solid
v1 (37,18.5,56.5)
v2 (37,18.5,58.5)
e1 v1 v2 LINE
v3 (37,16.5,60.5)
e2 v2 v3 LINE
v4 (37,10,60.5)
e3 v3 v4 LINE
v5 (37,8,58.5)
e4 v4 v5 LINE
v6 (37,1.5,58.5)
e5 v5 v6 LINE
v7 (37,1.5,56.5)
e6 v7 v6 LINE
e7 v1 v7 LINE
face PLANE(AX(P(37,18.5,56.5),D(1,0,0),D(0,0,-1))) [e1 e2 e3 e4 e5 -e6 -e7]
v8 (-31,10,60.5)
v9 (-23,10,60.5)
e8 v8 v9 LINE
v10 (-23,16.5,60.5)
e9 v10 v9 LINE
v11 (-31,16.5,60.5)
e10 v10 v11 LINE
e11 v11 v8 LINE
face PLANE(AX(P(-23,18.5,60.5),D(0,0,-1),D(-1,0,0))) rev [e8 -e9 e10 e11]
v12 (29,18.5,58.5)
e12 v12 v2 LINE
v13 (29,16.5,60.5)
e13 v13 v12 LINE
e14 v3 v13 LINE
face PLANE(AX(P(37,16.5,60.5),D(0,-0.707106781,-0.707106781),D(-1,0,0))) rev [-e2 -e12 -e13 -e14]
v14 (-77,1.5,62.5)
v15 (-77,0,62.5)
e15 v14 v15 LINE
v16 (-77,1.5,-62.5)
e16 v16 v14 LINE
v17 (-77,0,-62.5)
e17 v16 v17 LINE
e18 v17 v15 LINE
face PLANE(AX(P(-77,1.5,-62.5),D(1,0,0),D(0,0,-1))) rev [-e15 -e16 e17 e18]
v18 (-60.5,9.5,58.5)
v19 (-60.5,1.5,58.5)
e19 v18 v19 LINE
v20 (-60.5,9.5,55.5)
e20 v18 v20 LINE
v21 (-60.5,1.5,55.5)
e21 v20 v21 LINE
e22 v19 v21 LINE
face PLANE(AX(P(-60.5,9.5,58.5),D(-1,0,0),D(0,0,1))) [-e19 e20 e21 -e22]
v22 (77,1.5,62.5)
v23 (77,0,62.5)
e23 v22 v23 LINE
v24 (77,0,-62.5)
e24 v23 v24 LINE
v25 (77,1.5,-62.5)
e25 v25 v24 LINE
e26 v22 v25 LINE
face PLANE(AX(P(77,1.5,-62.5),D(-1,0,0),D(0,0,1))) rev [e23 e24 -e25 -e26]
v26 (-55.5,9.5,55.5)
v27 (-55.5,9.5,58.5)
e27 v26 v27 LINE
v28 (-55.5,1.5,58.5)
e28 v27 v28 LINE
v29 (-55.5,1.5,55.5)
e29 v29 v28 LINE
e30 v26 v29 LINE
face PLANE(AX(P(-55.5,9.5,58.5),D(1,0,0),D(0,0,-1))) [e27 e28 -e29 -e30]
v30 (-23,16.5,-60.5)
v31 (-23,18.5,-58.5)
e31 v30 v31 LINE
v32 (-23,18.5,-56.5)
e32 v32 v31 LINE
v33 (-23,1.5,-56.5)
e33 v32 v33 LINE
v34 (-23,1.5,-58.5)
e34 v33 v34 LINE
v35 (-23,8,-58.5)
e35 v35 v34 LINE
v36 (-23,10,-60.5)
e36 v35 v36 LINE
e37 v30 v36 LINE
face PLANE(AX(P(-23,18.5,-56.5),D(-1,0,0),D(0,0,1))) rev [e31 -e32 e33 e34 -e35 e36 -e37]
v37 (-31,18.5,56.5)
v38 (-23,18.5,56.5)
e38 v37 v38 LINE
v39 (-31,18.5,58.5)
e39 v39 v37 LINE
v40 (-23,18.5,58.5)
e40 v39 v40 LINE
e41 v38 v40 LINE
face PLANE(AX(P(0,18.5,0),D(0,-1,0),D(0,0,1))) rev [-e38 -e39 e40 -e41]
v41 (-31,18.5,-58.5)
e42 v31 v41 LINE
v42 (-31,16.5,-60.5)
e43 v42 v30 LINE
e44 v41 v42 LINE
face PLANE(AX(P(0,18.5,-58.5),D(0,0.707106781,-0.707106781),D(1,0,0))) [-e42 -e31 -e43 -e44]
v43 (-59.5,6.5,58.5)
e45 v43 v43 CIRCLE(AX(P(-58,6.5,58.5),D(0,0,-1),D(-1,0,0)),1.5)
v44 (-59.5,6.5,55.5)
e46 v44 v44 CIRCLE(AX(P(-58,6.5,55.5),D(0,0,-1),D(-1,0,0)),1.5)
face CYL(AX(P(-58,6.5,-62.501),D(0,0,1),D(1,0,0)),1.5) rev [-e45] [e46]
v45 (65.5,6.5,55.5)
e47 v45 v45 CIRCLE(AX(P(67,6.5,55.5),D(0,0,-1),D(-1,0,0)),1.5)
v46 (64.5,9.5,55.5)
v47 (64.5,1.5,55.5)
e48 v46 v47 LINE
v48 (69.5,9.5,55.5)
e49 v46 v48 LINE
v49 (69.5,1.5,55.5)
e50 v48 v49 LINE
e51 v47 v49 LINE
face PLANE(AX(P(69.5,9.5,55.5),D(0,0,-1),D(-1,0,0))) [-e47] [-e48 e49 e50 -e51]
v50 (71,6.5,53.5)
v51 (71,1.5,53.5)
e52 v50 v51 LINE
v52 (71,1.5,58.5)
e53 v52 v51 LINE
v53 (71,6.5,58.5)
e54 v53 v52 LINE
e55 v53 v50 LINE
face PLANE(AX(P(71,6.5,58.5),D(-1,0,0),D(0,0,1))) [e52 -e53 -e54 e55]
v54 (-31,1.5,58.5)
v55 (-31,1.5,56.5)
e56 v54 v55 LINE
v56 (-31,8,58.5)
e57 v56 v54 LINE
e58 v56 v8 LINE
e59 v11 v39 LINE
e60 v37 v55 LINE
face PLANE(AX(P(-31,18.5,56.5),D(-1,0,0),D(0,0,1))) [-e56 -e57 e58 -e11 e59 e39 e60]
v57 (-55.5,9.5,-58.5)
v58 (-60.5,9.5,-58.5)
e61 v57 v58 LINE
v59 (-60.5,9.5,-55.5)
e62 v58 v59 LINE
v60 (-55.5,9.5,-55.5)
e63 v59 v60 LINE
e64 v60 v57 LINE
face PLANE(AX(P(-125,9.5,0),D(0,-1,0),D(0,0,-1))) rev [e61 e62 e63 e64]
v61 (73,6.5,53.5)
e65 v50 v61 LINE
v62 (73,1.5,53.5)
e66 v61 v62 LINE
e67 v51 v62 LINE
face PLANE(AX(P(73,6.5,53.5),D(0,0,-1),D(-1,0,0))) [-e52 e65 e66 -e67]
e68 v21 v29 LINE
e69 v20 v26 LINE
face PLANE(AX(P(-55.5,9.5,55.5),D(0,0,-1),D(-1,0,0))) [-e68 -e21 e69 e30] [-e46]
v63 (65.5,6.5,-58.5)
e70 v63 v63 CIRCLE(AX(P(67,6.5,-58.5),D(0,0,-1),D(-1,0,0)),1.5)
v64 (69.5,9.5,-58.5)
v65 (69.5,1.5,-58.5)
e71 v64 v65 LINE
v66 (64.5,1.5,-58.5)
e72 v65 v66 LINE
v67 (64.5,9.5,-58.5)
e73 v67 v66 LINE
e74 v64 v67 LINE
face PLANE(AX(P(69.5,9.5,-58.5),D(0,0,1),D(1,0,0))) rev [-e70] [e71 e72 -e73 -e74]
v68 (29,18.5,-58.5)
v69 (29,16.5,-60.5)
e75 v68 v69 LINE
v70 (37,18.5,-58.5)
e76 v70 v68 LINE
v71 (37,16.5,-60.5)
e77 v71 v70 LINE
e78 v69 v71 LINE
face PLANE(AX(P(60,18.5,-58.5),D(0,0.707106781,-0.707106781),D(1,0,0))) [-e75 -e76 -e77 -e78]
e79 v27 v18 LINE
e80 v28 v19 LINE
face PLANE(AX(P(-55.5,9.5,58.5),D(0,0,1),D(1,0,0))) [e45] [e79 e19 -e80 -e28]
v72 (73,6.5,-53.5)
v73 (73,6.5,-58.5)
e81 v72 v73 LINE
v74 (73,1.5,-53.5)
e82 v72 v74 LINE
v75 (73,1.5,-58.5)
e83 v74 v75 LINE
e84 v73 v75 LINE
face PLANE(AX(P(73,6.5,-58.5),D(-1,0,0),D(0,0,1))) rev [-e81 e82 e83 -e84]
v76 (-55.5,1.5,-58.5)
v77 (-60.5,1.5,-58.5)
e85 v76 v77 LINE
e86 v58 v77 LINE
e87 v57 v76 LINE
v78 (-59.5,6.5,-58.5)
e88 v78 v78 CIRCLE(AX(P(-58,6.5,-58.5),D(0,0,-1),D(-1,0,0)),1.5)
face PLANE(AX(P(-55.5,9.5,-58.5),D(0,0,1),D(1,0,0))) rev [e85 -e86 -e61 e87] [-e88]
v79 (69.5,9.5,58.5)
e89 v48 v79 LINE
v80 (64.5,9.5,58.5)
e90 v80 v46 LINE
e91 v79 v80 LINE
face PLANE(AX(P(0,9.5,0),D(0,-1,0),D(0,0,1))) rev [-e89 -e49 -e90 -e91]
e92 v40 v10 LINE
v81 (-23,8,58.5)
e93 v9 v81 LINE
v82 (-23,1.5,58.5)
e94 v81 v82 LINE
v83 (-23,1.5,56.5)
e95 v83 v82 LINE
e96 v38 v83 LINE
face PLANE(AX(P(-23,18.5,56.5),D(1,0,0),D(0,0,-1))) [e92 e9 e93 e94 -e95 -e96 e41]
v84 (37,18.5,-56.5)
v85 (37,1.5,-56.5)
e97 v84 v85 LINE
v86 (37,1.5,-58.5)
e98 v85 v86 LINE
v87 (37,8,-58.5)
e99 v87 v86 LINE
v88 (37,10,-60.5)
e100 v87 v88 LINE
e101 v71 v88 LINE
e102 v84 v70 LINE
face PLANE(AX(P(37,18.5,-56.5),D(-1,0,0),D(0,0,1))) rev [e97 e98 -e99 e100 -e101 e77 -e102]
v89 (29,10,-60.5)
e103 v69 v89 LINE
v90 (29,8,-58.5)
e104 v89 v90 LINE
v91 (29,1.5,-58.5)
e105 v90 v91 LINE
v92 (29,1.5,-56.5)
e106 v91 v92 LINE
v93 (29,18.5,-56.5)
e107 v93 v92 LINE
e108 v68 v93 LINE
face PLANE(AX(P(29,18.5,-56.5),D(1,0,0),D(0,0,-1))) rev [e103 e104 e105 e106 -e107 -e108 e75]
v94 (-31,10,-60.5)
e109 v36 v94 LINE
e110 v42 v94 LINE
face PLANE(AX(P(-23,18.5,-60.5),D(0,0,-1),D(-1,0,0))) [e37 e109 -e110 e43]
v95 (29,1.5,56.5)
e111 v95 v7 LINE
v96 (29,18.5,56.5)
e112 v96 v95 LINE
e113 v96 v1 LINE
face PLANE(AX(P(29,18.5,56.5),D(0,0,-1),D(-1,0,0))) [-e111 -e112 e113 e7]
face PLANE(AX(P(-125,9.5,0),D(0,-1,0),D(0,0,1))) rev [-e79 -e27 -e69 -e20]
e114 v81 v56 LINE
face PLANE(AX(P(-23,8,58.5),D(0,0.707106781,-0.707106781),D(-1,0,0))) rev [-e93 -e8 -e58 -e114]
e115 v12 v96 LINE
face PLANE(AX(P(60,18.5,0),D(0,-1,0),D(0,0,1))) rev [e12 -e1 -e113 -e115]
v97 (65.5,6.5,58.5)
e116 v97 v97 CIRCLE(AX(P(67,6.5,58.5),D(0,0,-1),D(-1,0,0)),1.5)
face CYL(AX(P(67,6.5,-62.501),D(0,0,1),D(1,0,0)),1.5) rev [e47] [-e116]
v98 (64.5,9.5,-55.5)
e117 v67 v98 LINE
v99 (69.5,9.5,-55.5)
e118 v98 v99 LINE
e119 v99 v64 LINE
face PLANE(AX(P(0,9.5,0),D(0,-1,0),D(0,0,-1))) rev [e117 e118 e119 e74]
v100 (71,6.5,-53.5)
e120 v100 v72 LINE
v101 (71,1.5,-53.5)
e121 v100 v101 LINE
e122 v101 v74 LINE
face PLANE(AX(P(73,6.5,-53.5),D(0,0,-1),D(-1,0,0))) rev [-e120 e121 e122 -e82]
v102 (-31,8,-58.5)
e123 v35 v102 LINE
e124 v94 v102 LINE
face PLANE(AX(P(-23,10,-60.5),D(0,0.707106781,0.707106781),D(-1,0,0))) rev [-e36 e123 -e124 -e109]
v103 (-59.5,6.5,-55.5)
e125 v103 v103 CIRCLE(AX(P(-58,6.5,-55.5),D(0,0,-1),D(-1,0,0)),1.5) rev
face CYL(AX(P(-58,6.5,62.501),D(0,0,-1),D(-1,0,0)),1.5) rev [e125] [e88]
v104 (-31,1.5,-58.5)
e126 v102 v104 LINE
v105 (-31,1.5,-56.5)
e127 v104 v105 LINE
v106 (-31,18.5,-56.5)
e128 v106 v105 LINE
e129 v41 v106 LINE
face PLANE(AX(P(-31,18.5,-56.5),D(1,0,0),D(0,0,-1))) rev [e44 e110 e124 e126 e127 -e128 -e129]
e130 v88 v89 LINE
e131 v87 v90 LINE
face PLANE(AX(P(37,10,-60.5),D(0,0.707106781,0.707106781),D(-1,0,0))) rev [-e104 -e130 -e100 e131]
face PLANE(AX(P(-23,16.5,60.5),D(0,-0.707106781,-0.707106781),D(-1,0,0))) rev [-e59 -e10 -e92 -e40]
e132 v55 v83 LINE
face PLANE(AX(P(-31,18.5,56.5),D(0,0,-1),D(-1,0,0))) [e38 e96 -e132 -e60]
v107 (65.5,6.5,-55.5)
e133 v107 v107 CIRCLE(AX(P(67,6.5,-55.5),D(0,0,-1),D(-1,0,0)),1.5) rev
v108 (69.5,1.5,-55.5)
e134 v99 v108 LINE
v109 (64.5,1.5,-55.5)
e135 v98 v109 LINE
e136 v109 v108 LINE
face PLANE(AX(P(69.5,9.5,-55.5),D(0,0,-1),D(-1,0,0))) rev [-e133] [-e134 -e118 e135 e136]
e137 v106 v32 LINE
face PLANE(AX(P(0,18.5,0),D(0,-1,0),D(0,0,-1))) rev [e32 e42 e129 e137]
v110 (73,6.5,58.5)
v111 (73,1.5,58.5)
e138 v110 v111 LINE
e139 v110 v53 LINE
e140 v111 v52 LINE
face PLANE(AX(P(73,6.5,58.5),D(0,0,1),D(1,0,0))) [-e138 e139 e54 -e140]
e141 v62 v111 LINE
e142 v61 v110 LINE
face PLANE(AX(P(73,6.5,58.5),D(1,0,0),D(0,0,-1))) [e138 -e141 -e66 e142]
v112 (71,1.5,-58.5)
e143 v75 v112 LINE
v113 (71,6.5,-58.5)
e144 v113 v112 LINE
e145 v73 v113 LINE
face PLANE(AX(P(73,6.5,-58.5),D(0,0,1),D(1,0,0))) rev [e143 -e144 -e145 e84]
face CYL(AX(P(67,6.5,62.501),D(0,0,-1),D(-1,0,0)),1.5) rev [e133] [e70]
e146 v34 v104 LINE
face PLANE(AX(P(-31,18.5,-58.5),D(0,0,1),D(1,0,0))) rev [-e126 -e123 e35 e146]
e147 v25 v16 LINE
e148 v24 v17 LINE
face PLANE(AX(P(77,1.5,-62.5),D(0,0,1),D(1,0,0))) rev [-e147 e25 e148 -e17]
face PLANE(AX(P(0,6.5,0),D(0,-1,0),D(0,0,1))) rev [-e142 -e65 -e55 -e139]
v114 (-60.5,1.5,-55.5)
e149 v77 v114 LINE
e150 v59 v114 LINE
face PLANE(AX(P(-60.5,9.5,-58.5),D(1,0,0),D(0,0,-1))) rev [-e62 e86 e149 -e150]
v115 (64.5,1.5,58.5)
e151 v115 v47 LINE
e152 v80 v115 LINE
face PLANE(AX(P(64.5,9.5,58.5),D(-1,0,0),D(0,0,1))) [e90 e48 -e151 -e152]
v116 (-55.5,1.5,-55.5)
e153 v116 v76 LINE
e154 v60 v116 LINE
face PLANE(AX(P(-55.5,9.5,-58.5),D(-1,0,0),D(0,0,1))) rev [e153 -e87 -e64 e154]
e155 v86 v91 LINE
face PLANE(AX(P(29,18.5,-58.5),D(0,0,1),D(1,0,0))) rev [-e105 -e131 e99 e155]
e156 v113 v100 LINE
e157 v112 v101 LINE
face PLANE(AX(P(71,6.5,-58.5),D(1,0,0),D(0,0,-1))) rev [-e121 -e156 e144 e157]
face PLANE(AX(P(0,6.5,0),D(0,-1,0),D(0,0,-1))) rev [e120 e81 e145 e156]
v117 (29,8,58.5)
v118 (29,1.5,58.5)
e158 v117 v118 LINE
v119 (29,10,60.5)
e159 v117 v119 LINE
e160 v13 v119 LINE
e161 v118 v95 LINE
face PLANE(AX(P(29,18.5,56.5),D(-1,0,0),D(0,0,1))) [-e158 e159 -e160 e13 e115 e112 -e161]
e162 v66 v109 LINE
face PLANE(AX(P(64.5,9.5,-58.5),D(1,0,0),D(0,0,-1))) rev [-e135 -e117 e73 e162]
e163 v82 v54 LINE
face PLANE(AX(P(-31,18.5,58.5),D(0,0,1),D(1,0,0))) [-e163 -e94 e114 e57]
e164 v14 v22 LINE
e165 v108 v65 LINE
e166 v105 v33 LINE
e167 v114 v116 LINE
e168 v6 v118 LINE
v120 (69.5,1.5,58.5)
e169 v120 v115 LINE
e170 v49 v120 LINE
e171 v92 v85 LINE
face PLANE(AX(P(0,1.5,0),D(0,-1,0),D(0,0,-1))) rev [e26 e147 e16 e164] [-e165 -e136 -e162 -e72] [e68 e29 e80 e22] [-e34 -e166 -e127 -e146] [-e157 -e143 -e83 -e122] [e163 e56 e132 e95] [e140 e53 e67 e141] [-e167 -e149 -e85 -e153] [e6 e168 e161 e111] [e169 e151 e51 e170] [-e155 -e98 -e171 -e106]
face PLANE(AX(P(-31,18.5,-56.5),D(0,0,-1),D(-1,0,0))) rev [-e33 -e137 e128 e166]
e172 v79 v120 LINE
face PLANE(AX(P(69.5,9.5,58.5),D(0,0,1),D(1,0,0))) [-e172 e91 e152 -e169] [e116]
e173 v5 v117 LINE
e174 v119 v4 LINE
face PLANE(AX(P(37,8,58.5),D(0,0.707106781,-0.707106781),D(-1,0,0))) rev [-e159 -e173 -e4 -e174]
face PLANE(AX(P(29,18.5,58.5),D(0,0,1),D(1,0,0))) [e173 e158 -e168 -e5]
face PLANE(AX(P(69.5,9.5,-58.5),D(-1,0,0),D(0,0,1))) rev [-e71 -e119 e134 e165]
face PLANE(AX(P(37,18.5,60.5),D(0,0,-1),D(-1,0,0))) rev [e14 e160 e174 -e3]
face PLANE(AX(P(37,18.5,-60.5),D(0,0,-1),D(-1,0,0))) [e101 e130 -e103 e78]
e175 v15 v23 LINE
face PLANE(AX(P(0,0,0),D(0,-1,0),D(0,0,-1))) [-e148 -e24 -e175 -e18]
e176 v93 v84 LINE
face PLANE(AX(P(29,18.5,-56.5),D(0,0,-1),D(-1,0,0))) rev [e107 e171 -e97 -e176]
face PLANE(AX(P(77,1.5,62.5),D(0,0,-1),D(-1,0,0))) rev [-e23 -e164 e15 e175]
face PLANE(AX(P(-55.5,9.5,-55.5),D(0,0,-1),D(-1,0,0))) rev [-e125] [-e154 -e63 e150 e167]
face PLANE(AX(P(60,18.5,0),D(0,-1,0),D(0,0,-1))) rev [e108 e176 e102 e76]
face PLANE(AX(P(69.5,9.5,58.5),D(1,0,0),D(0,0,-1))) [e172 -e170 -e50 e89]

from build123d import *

# Parameters (mm, degrees)
SKETCH1_W                  = 154
SKETCH1_H                  = 125
BOSS_EXTRUDE1_DEPTH        = 1.5
SKETCH2_W                  = 2
SKETCH2_H                  = 5
BOSS_EXTRUDE2_DEPTH        = 5
SKETCH3_W                  = 8
SKETCH3_H                  = 2
BOSS_EXTRUDE3_DEPTH        = 17
SKETCH4_W                  = 2
SKETCH4_H                  = 10.5
BOSS_EXTRUDE4_DEPTH        = 8
CHAMFER1_SIZE              = 2
LPATTERN1_COUNT            = 2
LPATTERN1_PITCH            = 60
CHAMFER1_OF_LPATTERN1_SIZE = 2
SKETCH5_W                  = 5
SKETCH5_H                  = 3
BOSS_EXTRUDE5_DEPTH        = 8
CUT_EXTRUDE1_REACH         = 146.611
SKETCH6_R                  = 1.5
LPATTERN2_COUNT            = 2
LPATTERN2_PITCH            = 125
MIRROR1_START              = -31
MIRROR1_DEPTH              = 8
MIRROR1_START_2            = 29
MIRROR1_2_DEPTH            = 8
MIRROR1_START_3            = 71
MIRROR1_3_OUTLINE_W        = 5
MIRROR1_3_OUTLINE_H        = 5
MIRROR1_3_DEPTH            = 2
MIRROR1_START_4            = 55.5
MIRROR1_4_OUTLINE_W        = 5
MIRROR1_4_OUTLINE_H        = 8
MIRROR1_4_OUTLINE_R        = 1.5
MIRROR1_4_DEPTH            = 3


# Read off the part's stored shape, not the designer's step: Mirror1
with BuildPart() as part:
    # Sketch1 → Boss-Extrude1 (new body)
    with BuildSketch(Plane(origin=(0, 0, 0), x_dir=(1, 0, 0), z_dir=(0, 1, 0))):
        Rectangle(SKETCH1_W, SKETCH1_H)
    extrude(amount=BOSS_EXTRUDE1_DEPTH)

    # Sketch2 → Boss-Extrude2 (add)
    with BuildSketch(Plane(origin=(0, 1.5, 0), x_dir=(1, 0, 0), z_dir=(0, 1, 0))):
        with Locations((72, 56)):
            Rectangle(SKETCH2_W, SKETCH2_H)
    extrude(amount=BOSS_EXTRUDE2_DEPTH)

    # Sketch3 → Boss-Extrude3 (add)
    with BuildSketch(Plane(origin=(0, 1.5, 0), x_dir=(1, 0, 0), z_dir=(0, 1, 0))):
        with Locations((-27, 57.5)):
            Rectangle(SKETCH3_W, SKETCH3_H)
    boss_extrude3 = extrude(amount=BOSS_EXTRUDE3_DEPTH)

    # Sketch4 → Boss-Extrude4 (add)
    with BuildSketch(Plane.ZY.offset(31)):
        with Locations((-59.5, 13.25)):
            Rectangle(SKETCH4_W, SKETCH4_H)
    boss_extrude4 = extrude(amount=-BOSS_EXTRUDE4_DEPTH)

    # Chamfer1
    chamfer1_edges = [part.edges().sort_by_distance(p)[0] for p in [
        (-27, 18.5, -60.5),
        (-27, 8, -60.5),
    ]]
    chamfer(chamfer1_edges, length=CHAMFER1_SIZE - 0.0001)  # a hair under: the kernel refuses the full size

    # LPattern1: Boss-Extrude3, Boss-Extrude4 ×2
    with Locations(*[(i * LPATTERN1_PITCH, 0, 0) for i in range(1, LPATTERN1_COUNT)]):
        add(boss_extrude3)
        add(boss_extrude4)

    # Chamfer1 of LPattern1
    chamfer1_of_lpattern1_edges = [part.edges().sort_by_distance(p)[0] for p in [
        (33, 18.5, -60.5),
        (33, 8, -60.5),
    ]]
    chamfer(chamfer1_of_lpattern1_edges, length=CHAMFER1_OF_LPATTERN1_SIZE - 0.0001)  # a hair under: the kernel refuses the full size

    # Sketch5 → Boss-Extrude5 (add)
    with BuildSketch(Plane(origin=(0, 1.5, 0), x_dir=(1, 0, 0), z_dir=(0, 1, 0))):
        with Locations((67, 57)):
            Rectangle(SKETCH5_W, SKETCH5_H)
    boss_extrude5 = extrude(amount=BOSS_EXTRUDE5_DEPTH)

    # Sketch6 → Cut-Extrude1 (cut, up to next)
    with BuildSketch(Plane(origin=(0, 0, -58.5), x_dir=(-1, 0, 0), z_dir=(0, 0, -1)), mode=Mode.PRIVATE) as cut_extrude1_sk1:
        with Locations((-67, 6.5)):
            Circle(SKETCH6_R)
    cut_extrude1_tool1 = extrude(cut_extrude1_sk1.sketch, amount=-CUT_EXTRUDE1_REACH, mode=Mode.PRIVATE) & part.part
    cut_extrude1 = cut_extrude1_tool1.solids().sort_by_distance((67, 6.5, -58.5))[0]
    add(cut_extrude1, mode=Mode.SUBTRACT)

    # LPattern2: Boss-Extrude5, Cut-Extrude1 ×2
    with Locations(*[(-i * LPATTERN2_PITCH, 0, 0) for i in range(1, LPATTERN2_COUNT)]):
        add(boss_extrude5)
        add(cut_extrude1, mode=Mode.SUBTRACT)

    # Mirror1 outline → Mirror1 (add)
    with BuildSketch(Plane.YZ.offset(MIRROR1_START)):
        Polygon((10, 60.5), (8, 58.5), (1.5, 58.5), (1.5, 56.5), (18.5, 56.5), (18.5, 58.5), (16.5, 60.5), align=None)
    extrude(amount=MIRROR1_DEPTH)

    # Mirror1 2 outline → Mirror1 2 (add)
    with BuildSketch(Plane.YZ.offset(MIRROR1_START_2)):
        Polygon((10, 60.5), (8, 58.5), (1.5, 58.5), (1.5, 56.5), (18.5, 56.5), (18.5, 58.5), (16.5, 60.5), align=None)
    extrude(amount=MIRROR1_2_DEPTH)

    # Mirror1 3 outline → Mirror1 3 (add)
    with BuildSketch(Plane.YZ.offset(MIRROR1_START_3)):
        with Locations((4, 56)):
            Rectangle(MIRROR1_3_OUTLINE_W, MIRROR1_3_OUTLINE_H)
    extrude(amount=MIRROR1_3_DEPTH)

    # Mirror1 4 outline → Mirror1 4 (add)
    # profile 1 of 2: a face of its own
    with BuildSketch(Plane.XY.offset(MIRROR1_START_4)):
        with Locations((67, 5.5)):
            Rectangle(MIRROR1_4_OUTLINE_W, MIRROR1_4_OUTLINE_H)
        with Locations((67, 6.5)):
            Circle(MIRROR1_4_OUTLINE_R, mode=Mode.SUBTRACT)
    # profile 2 of 2: a face of its own
    with BuildSketch(Plane.XY.offset(MIRROR1_START_4)):
        with Locations((-58, 5.5)):
            Rectangle(MIRROR1_4_OUTLINE_W, MIRROR1_4_OUTLINE_H)
        with Locations((-58, 6.5)):
            Circle(MIRROR1_4_OUTLINE_R, mode=Mode.SUBTRACT)
    extrude(amount=MIRROR1_4_DEPTH)


solid = part.part
